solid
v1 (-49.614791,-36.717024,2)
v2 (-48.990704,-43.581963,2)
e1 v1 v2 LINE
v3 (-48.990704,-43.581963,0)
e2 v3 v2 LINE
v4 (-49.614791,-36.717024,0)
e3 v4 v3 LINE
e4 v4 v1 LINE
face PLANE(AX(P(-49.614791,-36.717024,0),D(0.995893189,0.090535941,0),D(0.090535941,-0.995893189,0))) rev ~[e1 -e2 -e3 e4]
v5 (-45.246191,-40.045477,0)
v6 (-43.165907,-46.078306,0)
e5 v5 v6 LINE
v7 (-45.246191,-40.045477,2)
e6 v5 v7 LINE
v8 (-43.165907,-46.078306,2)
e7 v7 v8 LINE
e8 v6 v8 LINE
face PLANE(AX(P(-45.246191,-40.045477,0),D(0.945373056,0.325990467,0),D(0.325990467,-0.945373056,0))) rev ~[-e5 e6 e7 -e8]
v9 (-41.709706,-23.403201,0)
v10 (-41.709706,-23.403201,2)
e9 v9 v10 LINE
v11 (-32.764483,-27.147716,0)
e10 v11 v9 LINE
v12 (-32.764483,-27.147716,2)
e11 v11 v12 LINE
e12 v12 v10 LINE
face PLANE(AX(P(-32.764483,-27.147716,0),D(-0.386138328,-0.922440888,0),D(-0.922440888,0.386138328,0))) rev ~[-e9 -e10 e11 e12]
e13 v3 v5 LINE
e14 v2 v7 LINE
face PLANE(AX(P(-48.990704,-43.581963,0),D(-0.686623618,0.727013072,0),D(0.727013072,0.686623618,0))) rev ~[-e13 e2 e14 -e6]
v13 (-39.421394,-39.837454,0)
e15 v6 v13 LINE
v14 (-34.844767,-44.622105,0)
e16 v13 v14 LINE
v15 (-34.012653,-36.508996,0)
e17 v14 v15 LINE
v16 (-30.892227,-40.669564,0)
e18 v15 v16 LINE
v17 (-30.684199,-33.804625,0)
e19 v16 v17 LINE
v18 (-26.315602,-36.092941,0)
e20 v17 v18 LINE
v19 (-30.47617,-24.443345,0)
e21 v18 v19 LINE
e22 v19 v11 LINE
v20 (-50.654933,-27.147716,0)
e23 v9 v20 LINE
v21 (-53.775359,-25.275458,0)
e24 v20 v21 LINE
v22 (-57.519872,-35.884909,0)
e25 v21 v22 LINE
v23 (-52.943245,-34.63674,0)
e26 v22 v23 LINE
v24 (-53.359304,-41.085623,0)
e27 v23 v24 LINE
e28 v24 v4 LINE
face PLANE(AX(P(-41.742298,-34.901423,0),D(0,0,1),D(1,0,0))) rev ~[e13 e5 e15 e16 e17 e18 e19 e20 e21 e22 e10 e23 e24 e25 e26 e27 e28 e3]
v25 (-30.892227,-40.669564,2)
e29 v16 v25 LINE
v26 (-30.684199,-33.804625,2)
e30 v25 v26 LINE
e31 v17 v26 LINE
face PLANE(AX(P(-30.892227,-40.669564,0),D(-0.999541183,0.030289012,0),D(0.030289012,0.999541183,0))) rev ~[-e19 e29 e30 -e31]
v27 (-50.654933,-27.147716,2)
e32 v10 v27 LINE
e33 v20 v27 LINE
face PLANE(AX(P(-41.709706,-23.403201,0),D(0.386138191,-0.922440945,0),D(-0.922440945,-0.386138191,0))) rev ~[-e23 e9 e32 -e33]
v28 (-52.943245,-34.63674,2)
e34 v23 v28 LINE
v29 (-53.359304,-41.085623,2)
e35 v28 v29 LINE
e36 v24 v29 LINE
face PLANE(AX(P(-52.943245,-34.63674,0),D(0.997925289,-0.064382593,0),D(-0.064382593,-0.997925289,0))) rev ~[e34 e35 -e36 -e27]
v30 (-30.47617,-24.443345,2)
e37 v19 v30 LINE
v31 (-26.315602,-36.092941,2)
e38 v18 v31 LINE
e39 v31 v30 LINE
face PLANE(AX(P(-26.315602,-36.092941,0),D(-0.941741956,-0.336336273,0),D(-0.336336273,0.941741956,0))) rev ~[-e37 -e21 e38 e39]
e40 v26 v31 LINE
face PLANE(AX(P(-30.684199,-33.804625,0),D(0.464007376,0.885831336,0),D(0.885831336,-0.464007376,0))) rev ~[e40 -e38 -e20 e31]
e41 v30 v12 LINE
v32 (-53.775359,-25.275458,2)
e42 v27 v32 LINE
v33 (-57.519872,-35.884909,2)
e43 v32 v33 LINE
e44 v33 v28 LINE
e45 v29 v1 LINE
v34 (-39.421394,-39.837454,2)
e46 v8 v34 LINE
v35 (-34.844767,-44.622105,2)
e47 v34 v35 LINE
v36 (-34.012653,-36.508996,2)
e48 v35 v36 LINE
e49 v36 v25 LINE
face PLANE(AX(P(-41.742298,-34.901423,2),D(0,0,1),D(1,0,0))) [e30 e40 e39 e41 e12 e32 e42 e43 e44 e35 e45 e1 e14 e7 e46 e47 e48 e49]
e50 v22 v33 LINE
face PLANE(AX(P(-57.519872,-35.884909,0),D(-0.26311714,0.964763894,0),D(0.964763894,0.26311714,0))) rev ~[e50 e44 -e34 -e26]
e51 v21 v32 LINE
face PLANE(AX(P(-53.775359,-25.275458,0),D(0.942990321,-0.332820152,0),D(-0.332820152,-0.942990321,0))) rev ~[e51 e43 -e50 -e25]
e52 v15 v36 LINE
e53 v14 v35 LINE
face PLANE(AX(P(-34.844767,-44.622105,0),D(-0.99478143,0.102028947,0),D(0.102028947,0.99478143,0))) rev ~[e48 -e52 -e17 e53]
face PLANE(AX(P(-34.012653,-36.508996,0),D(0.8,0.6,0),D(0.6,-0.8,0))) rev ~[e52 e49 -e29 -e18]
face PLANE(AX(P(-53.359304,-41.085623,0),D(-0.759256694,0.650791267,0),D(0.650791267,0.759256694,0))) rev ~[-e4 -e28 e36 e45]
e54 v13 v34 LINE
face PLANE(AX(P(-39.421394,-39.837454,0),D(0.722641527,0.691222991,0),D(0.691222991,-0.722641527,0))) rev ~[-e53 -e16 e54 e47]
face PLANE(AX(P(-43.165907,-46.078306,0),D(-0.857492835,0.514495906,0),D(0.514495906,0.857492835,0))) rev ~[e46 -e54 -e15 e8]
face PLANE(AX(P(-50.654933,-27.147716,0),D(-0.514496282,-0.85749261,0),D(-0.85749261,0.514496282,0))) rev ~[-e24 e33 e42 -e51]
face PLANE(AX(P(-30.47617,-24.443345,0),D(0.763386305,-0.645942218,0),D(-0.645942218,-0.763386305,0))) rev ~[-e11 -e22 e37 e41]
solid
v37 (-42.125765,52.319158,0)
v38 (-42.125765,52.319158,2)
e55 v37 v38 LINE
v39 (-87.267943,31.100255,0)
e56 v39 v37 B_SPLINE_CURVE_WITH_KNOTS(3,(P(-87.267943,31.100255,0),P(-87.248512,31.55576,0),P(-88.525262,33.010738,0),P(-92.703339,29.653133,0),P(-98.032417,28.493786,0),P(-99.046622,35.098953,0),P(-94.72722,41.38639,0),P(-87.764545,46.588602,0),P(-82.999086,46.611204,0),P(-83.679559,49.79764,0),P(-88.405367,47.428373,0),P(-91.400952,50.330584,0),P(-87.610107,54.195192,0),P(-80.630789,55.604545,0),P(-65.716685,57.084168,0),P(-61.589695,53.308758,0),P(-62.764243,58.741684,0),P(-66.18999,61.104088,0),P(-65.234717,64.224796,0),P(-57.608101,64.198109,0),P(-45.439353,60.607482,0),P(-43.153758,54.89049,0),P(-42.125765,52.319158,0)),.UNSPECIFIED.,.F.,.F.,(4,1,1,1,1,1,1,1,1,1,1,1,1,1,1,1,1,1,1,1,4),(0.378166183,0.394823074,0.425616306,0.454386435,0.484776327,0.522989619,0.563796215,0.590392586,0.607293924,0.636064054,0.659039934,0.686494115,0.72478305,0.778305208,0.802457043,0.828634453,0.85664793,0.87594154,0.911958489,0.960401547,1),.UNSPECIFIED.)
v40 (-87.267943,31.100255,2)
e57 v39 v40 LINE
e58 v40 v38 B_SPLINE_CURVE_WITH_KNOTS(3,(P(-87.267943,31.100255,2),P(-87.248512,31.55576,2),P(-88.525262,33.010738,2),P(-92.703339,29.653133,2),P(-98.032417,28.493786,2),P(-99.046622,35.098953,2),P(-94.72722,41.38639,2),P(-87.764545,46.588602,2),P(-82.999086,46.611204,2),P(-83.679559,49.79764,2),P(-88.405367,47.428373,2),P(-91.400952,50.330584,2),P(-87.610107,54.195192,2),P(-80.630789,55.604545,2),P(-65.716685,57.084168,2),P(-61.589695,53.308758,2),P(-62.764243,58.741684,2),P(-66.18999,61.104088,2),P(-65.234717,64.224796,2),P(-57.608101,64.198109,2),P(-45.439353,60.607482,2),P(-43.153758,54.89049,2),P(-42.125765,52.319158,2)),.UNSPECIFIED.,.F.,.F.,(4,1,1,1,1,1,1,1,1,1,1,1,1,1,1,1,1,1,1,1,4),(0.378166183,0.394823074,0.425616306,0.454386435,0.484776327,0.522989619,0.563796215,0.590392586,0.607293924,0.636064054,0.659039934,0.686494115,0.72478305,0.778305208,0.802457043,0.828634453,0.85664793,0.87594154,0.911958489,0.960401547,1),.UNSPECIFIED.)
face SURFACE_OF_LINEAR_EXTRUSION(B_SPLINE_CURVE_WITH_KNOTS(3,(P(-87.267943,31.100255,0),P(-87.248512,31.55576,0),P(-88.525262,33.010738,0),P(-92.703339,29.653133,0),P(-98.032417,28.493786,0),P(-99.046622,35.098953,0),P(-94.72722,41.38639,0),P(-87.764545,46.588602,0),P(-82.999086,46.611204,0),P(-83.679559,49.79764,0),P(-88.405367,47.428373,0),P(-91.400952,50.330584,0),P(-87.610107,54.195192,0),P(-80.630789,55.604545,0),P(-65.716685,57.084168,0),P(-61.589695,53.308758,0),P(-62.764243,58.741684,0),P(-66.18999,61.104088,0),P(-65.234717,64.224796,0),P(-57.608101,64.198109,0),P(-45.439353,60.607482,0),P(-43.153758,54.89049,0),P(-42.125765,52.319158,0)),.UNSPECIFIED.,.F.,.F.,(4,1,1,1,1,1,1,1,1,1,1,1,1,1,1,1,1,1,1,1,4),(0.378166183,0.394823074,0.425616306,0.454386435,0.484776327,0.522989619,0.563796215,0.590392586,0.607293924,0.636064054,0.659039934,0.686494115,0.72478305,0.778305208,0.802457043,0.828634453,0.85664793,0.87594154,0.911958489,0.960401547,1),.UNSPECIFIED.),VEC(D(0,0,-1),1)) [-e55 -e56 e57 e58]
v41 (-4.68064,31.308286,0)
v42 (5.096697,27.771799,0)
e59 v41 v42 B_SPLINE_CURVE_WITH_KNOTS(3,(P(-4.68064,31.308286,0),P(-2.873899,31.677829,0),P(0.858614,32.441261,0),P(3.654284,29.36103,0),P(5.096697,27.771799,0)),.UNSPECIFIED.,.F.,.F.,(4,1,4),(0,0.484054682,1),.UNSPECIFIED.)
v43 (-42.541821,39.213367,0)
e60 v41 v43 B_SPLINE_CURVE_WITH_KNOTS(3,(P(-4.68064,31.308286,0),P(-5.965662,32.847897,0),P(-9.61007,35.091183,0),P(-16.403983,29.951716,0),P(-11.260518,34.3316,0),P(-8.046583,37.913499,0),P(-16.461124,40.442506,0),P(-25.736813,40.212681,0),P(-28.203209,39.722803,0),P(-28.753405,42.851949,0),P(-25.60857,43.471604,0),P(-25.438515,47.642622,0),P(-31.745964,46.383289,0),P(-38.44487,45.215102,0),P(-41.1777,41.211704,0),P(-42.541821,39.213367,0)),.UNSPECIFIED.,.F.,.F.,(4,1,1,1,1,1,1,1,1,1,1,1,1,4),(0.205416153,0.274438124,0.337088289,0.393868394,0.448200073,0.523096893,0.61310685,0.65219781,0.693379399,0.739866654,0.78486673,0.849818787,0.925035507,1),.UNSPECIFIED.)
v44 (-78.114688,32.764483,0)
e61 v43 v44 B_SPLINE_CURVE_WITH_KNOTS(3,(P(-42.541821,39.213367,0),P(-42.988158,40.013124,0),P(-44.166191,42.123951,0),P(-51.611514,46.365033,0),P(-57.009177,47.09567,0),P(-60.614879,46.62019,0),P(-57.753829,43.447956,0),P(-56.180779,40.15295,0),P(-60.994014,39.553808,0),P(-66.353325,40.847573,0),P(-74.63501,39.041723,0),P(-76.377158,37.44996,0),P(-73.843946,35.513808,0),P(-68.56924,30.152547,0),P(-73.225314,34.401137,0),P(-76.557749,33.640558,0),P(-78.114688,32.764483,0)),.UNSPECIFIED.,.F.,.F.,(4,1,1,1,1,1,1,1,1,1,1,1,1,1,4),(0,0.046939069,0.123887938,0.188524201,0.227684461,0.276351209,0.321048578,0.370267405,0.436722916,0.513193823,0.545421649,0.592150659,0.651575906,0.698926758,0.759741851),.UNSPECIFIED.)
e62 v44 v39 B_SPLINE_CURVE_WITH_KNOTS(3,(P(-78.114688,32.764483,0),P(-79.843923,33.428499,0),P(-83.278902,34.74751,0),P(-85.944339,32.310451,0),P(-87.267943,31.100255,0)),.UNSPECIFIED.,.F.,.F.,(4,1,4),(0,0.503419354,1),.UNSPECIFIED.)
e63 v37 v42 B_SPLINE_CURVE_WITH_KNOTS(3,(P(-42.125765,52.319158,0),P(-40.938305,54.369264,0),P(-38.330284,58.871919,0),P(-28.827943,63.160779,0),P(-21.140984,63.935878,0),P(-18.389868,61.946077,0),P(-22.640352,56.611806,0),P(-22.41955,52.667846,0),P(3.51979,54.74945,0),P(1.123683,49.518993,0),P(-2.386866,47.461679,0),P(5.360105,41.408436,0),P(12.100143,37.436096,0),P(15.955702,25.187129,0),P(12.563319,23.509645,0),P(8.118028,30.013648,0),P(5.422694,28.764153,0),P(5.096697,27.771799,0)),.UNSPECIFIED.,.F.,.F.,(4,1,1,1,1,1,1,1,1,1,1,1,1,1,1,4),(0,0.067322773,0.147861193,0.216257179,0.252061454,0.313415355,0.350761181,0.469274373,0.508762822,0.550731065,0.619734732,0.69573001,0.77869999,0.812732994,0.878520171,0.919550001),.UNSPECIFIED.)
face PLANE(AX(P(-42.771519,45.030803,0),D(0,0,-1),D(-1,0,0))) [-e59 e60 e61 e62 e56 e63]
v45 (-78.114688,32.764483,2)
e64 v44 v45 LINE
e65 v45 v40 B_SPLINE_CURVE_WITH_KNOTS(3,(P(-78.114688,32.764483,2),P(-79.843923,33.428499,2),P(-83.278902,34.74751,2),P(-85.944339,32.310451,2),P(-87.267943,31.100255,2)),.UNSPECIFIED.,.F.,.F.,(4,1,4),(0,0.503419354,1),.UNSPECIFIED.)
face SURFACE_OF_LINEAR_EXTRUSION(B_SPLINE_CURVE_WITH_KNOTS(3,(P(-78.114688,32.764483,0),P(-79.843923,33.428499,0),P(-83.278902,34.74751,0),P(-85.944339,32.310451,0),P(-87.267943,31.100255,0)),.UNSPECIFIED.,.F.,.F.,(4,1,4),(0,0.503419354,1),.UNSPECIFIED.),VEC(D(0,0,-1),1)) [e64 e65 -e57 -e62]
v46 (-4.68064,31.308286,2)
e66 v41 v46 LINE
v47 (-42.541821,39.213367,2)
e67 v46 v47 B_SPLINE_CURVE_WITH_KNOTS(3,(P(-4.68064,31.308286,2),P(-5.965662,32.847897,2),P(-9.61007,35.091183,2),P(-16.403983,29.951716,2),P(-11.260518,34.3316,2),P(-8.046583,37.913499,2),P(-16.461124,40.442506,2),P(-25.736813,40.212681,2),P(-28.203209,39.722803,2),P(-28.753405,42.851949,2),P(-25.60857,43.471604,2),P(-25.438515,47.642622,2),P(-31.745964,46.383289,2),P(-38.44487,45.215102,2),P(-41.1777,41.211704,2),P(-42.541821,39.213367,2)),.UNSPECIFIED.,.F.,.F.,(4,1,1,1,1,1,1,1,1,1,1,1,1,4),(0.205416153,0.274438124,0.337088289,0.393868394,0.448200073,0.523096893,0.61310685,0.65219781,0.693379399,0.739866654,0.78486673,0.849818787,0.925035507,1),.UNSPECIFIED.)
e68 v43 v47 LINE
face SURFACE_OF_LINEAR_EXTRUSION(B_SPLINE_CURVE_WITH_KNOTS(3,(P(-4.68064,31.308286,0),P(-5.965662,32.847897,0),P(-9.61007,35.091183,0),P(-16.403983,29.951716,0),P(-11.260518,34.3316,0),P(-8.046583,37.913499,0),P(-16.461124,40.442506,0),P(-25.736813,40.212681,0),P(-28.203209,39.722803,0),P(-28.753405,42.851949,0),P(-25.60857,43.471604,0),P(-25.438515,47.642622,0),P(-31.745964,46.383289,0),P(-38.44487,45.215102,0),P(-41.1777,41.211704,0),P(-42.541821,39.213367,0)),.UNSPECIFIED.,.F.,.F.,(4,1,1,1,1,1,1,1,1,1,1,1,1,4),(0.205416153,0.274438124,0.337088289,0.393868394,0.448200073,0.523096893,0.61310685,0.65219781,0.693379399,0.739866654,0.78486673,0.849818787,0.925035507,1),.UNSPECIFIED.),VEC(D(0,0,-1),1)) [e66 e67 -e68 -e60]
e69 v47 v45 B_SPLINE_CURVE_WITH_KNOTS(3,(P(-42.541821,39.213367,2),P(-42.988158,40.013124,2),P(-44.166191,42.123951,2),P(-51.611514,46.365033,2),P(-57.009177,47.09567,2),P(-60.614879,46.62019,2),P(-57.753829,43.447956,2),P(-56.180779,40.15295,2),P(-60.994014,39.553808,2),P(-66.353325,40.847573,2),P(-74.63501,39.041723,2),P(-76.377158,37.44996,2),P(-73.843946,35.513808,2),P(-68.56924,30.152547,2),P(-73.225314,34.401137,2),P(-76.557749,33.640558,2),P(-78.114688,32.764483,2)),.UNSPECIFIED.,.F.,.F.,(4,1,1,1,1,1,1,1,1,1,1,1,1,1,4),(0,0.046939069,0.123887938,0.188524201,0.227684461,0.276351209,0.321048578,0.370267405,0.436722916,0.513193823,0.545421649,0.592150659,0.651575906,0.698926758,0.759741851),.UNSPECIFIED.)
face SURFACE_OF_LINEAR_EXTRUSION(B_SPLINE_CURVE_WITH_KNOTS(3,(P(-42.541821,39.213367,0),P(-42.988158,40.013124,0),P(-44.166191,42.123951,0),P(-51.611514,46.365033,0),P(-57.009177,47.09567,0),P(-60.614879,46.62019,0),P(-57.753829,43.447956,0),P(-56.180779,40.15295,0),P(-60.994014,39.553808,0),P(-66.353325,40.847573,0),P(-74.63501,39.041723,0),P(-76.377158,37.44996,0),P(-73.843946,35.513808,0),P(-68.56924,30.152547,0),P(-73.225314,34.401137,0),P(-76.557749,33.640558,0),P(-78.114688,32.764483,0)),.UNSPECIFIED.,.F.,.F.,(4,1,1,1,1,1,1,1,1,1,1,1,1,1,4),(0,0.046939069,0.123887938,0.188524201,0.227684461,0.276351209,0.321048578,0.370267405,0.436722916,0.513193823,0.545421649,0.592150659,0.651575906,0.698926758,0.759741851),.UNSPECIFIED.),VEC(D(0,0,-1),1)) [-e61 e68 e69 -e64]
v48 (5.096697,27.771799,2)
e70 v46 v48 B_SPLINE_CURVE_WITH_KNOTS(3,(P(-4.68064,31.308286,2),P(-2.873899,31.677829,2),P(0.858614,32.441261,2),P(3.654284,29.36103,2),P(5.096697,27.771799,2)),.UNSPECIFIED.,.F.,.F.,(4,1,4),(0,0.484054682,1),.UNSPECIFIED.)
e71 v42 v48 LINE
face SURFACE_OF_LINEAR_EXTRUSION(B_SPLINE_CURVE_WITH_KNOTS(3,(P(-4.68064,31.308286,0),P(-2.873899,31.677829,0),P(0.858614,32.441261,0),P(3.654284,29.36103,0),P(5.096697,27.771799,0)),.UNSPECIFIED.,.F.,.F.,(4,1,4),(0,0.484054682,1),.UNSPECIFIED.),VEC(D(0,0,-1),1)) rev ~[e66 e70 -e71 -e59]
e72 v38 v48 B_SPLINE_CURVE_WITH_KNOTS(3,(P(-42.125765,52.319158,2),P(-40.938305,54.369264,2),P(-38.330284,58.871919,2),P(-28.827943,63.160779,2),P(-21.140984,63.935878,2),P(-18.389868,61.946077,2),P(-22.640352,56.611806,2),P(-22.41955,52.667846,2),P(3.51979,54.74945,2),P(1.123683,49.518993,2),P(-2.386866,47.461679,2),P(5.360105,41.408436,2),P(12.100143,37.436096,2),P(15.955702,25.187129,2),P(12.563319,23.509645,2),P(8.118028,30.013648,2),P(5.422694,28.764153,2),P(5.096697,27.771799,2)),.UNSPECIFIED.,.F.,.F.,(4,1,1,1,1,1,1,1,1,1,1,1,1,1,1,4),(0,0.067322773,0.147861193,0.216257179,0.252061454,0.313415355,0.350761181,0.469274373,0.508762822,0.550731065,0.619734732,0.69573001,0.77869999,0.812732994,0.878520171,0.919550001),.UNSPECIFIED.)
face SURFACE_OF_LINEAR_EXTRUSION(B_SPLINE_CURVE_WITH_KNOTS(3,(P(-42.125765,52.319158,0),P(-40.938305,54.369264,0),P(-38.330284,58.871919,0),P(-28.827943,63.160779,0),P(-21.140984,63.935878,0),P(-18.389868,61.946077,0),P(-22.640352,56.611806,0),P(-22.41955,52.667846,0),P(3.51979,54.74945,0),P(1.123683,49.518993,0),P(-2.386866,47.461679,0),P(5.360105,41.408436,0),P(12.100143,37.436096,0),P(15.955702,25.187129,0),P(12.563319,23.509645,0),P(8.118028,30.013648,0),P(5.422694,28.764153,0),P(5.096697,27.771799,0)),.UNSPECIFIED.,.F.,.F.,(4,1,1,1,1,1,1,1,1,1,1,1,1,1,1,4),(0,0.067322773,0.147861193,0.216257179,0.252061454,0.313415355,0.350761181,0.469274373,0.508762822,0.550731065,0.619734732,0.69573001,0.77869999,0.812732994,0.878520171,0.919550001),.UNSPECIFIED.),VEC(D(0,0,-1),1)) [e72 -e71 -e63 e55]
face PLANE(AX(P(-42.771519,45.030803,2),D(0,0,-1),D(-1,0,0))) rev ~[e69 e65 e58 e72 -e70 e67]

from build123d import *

# Parameters (mm, degrees)
F1_DEPTH = 2


# Not quite as in the source:
# - a feature of the source that left no trace in its solid (it failed there, or was rolled back) is left out


with BuildPart() as f1:
    # F0 (on Top) → F1 (new body)
    with BuildSketch(Plane.XY):
        with BuildLine():
            add(Edge.make_bspline(
                [(-78.1146883965, 32.7644832432), (-79.8439233254, 33.4284988046), (-83.278902367, 34.7475095986), (-85.9443386529, 32.3104507594), (-87.2679427266, 31.1002545059)],
                knots=[0, 0, 0, 0, 0.5034193536, 1, 1, 1, 1], degree=3))
            add(Edge.make_bspline(
                [(-42.5418205559, 39.2133668065), (-42.9881577653, 40.0131240327), (-44.1661912721, 42.1239514298), (-51.6115142204, 46.3650325189), (-57.0091765019, 47.0956703629), (-60.6148794703, 46.6201895743), (-57.7538294439, 43.4479557533), (-56.180778889, 40.1529498732), (-60.9940135931, 39.5538077388), (-66.3533249535, 40.8475728894), (-74.6350098706, 39.0417230977), (-76.3771578139, 37.4499603376), (-73.8439459206, 35.5138082715), (-68.5692401029, 30.1525469176), (-73.2253142698, 34.4011373863), (-76.557748644, 33.640558036), (-78.1146883965, 32.7644832432)],
                knots=[0, 0, 0, 0, 0.0469390695, 0.1238879383, 0.1885242015, 0.2276844615, 0.2763512093, 0.3210485779, 0.3702674052, 0.4367229163, 0.5131938234, 0.5454216494, 0.592150659, 0.651575906, 0.6989267584, 0.7597418512, 0.7597418512, 0.7597418512, 0.7597418512], degree=3))
            add(Edge.make_bspline(
                [(-4.6806400642, 31.308285892), (-5.9656620832, 32.847897371), (-9.6100700572, 35.0911827196), (-16.4039831582, 29.9517155128), (-11.2605175981, 34.3316004388), (-8.0465825383, 37.9134992605), (-16.4611236648, 40.442506288), (-25.7368132326, 40.2126806715), (-28.2032088922, 39.7228029764), (-28.753404739, 42.8519487562), (-25.6085695806, 43.4716036385), (-25.4385154838, 47.6426221355), (-31.7459644318, 46.3832888128), (-38.4448695025, 45.2151020848), (-41.1777001261, 41.2117040092), (-42.5418205559, 39.2133668065)],
                knots=[0.2054161527, 0.2054161527, 0.2054161527, 0.2054161527, 0.2744381238, 0.337088289, 0.3938683938, 0.4482000731, 0.5230968929, 0.6131068496, 0.6521978096, 0.6933793991, 0.7398666544, 0.78486673, 0.849818787, 0.9250355075, 1, 1, 1, 1], degree=3))
            add(Edge.make_bspline(
                [(-4.6806400642, 31.308285892), (-2.8738994377, 31.6778287409), (0.8586140408, 32.4412607711), (3.6542842794, 29.3610296947), (5.0966972485, 27.7717988938)],
                knots=[0, 0, 0, 0, 0.4840546824, 1, 1, 1, 1], degree=3))
            add(Edge.make_bspline(
                [(-42.1257652342, 52.3191578686), (-40.9383053307, 54.369264377), (-38.3302838513, 58.8719189874), (-28.8279433408, 63.1607793167), (-21.1409836142, 63.9358777675), (-18.3898677035, 61.946076837), (-22.6403519936, 56.6118059723), (-22.4195501027, 52.6678459901), (3.5197902884, 54.7494498371), (1.1236831442, 49.5189934563), (-2.3868660157, 47.461679138), (5.3601052781, 41.4084355763), (12.1001432584, 37.4360959792), (15.9557024653, 25.1871293377), (12.5633189349, 23.5096446907), (8.1180278163, 30.0136480103), (5.4226940702, 28.7641528644), (5.0966972485, 27.7717988938)],
                knots=[0, 0, 0, 0, 0.0673227732, 0.1478611935, 0.2162571792, 0.2520614536, 0.3134153549, 0.3507611814, 0.4692743729, 0.5087628221, 0.5507310653, 0.6197347319, 0.6957300099, 0.7786999902, 0.8127329943, 0.8785201714, 0.9195500013, 0.9195500013, 0.9195500013, 0.9195500013], degree=3))
            add(Edge.make_bspline(
                [(-87.2679427266, 31.1002545059), (-87.2485118161, 31.5557596075), (-88.5252620658, 33.0107379245), (-92.7033394549, 29.6531327281), (-98.0324174638, 28.49378586), (-99.0466215971, 35.0989526016), (-94.7272198386, 41.3863896024), (-87.764545452, 46.5886019068), (-82.9990861881, 46.6112042122), (-83.679558813, 49.797639546), (-88.405366619, 47.4283733088), (-91.4009523992, 50.330583999), (-87.6101072381, 54.195191634), (-80.6307891019, 55.6045445895), (-65.7166849924, 57.0841681174), (-61.5896949539, 53.3087577959), (-62.7642434778, 58.7416835725), (-66.1899903184, 61.1040883364), (-65.2347173459, 64.224795666), (-57.6081010337, 64.1981094362), (-45.4393527169, 60.6074817113), (-43.1537578364, 54.890490492), (-42.1257652342, 52.3191578686)],
                knots=[0.3781661826, 0.3781661826, 0.3781661826, 0.3781661826, 0.3948230743, 0.4256163056, 0.4543864352, 0.4847763275, 0.5229896191, 0.5637962148, 0.5903925864, 0.6072939236, 0.6360640538, 0.6590399339, 0.6864941146, 0.7247830495, 0.7783052081, 0.8024570428, 0.8286344533, 0.8566479295, 0.8759415404, 0.9119584894, 0.9604015469, 1, 1, 1, 1], degree=3))
        make_face()
    extrude(amount=F1_DEPTH)


with BuildPart() as f1b:
    # F0 (on Top) → F1, piece 2 (new body)
    with BuildSketch(Plane.XY):
        Polygon((-50.6549328566, -27.1477159113), (-53.7753589451, -25.2754576504), (-57.5198717415, -35.8849093318), (-52.9432445765, -34.6367396414), (-53.3593036234, -41.0856232047), (-49.614790827, -36.7170237005), (-48.9907041192, -43.5819625854), (-45.2461913228, -40.0454774499), (-43.1659072638, -46.0783056915), (-39.4213944674, -39.8374535143), (-34.8447673023, -44.622104615), (-34.0126529336, -36.5089960396), (-30.892226845, -40.6695641577), (-30.6841991842, -33.8046252728), (-26.3156015426, -36.0929407179), (-30.4761696607, -24.4433451444), (-32.7644832432, -27.1477159113), (-41.7097061872, -23.4032012522), align=None)
    extrude(amount=F1_DEPTH)


solid = Compound([f1.part, f1b.part])
